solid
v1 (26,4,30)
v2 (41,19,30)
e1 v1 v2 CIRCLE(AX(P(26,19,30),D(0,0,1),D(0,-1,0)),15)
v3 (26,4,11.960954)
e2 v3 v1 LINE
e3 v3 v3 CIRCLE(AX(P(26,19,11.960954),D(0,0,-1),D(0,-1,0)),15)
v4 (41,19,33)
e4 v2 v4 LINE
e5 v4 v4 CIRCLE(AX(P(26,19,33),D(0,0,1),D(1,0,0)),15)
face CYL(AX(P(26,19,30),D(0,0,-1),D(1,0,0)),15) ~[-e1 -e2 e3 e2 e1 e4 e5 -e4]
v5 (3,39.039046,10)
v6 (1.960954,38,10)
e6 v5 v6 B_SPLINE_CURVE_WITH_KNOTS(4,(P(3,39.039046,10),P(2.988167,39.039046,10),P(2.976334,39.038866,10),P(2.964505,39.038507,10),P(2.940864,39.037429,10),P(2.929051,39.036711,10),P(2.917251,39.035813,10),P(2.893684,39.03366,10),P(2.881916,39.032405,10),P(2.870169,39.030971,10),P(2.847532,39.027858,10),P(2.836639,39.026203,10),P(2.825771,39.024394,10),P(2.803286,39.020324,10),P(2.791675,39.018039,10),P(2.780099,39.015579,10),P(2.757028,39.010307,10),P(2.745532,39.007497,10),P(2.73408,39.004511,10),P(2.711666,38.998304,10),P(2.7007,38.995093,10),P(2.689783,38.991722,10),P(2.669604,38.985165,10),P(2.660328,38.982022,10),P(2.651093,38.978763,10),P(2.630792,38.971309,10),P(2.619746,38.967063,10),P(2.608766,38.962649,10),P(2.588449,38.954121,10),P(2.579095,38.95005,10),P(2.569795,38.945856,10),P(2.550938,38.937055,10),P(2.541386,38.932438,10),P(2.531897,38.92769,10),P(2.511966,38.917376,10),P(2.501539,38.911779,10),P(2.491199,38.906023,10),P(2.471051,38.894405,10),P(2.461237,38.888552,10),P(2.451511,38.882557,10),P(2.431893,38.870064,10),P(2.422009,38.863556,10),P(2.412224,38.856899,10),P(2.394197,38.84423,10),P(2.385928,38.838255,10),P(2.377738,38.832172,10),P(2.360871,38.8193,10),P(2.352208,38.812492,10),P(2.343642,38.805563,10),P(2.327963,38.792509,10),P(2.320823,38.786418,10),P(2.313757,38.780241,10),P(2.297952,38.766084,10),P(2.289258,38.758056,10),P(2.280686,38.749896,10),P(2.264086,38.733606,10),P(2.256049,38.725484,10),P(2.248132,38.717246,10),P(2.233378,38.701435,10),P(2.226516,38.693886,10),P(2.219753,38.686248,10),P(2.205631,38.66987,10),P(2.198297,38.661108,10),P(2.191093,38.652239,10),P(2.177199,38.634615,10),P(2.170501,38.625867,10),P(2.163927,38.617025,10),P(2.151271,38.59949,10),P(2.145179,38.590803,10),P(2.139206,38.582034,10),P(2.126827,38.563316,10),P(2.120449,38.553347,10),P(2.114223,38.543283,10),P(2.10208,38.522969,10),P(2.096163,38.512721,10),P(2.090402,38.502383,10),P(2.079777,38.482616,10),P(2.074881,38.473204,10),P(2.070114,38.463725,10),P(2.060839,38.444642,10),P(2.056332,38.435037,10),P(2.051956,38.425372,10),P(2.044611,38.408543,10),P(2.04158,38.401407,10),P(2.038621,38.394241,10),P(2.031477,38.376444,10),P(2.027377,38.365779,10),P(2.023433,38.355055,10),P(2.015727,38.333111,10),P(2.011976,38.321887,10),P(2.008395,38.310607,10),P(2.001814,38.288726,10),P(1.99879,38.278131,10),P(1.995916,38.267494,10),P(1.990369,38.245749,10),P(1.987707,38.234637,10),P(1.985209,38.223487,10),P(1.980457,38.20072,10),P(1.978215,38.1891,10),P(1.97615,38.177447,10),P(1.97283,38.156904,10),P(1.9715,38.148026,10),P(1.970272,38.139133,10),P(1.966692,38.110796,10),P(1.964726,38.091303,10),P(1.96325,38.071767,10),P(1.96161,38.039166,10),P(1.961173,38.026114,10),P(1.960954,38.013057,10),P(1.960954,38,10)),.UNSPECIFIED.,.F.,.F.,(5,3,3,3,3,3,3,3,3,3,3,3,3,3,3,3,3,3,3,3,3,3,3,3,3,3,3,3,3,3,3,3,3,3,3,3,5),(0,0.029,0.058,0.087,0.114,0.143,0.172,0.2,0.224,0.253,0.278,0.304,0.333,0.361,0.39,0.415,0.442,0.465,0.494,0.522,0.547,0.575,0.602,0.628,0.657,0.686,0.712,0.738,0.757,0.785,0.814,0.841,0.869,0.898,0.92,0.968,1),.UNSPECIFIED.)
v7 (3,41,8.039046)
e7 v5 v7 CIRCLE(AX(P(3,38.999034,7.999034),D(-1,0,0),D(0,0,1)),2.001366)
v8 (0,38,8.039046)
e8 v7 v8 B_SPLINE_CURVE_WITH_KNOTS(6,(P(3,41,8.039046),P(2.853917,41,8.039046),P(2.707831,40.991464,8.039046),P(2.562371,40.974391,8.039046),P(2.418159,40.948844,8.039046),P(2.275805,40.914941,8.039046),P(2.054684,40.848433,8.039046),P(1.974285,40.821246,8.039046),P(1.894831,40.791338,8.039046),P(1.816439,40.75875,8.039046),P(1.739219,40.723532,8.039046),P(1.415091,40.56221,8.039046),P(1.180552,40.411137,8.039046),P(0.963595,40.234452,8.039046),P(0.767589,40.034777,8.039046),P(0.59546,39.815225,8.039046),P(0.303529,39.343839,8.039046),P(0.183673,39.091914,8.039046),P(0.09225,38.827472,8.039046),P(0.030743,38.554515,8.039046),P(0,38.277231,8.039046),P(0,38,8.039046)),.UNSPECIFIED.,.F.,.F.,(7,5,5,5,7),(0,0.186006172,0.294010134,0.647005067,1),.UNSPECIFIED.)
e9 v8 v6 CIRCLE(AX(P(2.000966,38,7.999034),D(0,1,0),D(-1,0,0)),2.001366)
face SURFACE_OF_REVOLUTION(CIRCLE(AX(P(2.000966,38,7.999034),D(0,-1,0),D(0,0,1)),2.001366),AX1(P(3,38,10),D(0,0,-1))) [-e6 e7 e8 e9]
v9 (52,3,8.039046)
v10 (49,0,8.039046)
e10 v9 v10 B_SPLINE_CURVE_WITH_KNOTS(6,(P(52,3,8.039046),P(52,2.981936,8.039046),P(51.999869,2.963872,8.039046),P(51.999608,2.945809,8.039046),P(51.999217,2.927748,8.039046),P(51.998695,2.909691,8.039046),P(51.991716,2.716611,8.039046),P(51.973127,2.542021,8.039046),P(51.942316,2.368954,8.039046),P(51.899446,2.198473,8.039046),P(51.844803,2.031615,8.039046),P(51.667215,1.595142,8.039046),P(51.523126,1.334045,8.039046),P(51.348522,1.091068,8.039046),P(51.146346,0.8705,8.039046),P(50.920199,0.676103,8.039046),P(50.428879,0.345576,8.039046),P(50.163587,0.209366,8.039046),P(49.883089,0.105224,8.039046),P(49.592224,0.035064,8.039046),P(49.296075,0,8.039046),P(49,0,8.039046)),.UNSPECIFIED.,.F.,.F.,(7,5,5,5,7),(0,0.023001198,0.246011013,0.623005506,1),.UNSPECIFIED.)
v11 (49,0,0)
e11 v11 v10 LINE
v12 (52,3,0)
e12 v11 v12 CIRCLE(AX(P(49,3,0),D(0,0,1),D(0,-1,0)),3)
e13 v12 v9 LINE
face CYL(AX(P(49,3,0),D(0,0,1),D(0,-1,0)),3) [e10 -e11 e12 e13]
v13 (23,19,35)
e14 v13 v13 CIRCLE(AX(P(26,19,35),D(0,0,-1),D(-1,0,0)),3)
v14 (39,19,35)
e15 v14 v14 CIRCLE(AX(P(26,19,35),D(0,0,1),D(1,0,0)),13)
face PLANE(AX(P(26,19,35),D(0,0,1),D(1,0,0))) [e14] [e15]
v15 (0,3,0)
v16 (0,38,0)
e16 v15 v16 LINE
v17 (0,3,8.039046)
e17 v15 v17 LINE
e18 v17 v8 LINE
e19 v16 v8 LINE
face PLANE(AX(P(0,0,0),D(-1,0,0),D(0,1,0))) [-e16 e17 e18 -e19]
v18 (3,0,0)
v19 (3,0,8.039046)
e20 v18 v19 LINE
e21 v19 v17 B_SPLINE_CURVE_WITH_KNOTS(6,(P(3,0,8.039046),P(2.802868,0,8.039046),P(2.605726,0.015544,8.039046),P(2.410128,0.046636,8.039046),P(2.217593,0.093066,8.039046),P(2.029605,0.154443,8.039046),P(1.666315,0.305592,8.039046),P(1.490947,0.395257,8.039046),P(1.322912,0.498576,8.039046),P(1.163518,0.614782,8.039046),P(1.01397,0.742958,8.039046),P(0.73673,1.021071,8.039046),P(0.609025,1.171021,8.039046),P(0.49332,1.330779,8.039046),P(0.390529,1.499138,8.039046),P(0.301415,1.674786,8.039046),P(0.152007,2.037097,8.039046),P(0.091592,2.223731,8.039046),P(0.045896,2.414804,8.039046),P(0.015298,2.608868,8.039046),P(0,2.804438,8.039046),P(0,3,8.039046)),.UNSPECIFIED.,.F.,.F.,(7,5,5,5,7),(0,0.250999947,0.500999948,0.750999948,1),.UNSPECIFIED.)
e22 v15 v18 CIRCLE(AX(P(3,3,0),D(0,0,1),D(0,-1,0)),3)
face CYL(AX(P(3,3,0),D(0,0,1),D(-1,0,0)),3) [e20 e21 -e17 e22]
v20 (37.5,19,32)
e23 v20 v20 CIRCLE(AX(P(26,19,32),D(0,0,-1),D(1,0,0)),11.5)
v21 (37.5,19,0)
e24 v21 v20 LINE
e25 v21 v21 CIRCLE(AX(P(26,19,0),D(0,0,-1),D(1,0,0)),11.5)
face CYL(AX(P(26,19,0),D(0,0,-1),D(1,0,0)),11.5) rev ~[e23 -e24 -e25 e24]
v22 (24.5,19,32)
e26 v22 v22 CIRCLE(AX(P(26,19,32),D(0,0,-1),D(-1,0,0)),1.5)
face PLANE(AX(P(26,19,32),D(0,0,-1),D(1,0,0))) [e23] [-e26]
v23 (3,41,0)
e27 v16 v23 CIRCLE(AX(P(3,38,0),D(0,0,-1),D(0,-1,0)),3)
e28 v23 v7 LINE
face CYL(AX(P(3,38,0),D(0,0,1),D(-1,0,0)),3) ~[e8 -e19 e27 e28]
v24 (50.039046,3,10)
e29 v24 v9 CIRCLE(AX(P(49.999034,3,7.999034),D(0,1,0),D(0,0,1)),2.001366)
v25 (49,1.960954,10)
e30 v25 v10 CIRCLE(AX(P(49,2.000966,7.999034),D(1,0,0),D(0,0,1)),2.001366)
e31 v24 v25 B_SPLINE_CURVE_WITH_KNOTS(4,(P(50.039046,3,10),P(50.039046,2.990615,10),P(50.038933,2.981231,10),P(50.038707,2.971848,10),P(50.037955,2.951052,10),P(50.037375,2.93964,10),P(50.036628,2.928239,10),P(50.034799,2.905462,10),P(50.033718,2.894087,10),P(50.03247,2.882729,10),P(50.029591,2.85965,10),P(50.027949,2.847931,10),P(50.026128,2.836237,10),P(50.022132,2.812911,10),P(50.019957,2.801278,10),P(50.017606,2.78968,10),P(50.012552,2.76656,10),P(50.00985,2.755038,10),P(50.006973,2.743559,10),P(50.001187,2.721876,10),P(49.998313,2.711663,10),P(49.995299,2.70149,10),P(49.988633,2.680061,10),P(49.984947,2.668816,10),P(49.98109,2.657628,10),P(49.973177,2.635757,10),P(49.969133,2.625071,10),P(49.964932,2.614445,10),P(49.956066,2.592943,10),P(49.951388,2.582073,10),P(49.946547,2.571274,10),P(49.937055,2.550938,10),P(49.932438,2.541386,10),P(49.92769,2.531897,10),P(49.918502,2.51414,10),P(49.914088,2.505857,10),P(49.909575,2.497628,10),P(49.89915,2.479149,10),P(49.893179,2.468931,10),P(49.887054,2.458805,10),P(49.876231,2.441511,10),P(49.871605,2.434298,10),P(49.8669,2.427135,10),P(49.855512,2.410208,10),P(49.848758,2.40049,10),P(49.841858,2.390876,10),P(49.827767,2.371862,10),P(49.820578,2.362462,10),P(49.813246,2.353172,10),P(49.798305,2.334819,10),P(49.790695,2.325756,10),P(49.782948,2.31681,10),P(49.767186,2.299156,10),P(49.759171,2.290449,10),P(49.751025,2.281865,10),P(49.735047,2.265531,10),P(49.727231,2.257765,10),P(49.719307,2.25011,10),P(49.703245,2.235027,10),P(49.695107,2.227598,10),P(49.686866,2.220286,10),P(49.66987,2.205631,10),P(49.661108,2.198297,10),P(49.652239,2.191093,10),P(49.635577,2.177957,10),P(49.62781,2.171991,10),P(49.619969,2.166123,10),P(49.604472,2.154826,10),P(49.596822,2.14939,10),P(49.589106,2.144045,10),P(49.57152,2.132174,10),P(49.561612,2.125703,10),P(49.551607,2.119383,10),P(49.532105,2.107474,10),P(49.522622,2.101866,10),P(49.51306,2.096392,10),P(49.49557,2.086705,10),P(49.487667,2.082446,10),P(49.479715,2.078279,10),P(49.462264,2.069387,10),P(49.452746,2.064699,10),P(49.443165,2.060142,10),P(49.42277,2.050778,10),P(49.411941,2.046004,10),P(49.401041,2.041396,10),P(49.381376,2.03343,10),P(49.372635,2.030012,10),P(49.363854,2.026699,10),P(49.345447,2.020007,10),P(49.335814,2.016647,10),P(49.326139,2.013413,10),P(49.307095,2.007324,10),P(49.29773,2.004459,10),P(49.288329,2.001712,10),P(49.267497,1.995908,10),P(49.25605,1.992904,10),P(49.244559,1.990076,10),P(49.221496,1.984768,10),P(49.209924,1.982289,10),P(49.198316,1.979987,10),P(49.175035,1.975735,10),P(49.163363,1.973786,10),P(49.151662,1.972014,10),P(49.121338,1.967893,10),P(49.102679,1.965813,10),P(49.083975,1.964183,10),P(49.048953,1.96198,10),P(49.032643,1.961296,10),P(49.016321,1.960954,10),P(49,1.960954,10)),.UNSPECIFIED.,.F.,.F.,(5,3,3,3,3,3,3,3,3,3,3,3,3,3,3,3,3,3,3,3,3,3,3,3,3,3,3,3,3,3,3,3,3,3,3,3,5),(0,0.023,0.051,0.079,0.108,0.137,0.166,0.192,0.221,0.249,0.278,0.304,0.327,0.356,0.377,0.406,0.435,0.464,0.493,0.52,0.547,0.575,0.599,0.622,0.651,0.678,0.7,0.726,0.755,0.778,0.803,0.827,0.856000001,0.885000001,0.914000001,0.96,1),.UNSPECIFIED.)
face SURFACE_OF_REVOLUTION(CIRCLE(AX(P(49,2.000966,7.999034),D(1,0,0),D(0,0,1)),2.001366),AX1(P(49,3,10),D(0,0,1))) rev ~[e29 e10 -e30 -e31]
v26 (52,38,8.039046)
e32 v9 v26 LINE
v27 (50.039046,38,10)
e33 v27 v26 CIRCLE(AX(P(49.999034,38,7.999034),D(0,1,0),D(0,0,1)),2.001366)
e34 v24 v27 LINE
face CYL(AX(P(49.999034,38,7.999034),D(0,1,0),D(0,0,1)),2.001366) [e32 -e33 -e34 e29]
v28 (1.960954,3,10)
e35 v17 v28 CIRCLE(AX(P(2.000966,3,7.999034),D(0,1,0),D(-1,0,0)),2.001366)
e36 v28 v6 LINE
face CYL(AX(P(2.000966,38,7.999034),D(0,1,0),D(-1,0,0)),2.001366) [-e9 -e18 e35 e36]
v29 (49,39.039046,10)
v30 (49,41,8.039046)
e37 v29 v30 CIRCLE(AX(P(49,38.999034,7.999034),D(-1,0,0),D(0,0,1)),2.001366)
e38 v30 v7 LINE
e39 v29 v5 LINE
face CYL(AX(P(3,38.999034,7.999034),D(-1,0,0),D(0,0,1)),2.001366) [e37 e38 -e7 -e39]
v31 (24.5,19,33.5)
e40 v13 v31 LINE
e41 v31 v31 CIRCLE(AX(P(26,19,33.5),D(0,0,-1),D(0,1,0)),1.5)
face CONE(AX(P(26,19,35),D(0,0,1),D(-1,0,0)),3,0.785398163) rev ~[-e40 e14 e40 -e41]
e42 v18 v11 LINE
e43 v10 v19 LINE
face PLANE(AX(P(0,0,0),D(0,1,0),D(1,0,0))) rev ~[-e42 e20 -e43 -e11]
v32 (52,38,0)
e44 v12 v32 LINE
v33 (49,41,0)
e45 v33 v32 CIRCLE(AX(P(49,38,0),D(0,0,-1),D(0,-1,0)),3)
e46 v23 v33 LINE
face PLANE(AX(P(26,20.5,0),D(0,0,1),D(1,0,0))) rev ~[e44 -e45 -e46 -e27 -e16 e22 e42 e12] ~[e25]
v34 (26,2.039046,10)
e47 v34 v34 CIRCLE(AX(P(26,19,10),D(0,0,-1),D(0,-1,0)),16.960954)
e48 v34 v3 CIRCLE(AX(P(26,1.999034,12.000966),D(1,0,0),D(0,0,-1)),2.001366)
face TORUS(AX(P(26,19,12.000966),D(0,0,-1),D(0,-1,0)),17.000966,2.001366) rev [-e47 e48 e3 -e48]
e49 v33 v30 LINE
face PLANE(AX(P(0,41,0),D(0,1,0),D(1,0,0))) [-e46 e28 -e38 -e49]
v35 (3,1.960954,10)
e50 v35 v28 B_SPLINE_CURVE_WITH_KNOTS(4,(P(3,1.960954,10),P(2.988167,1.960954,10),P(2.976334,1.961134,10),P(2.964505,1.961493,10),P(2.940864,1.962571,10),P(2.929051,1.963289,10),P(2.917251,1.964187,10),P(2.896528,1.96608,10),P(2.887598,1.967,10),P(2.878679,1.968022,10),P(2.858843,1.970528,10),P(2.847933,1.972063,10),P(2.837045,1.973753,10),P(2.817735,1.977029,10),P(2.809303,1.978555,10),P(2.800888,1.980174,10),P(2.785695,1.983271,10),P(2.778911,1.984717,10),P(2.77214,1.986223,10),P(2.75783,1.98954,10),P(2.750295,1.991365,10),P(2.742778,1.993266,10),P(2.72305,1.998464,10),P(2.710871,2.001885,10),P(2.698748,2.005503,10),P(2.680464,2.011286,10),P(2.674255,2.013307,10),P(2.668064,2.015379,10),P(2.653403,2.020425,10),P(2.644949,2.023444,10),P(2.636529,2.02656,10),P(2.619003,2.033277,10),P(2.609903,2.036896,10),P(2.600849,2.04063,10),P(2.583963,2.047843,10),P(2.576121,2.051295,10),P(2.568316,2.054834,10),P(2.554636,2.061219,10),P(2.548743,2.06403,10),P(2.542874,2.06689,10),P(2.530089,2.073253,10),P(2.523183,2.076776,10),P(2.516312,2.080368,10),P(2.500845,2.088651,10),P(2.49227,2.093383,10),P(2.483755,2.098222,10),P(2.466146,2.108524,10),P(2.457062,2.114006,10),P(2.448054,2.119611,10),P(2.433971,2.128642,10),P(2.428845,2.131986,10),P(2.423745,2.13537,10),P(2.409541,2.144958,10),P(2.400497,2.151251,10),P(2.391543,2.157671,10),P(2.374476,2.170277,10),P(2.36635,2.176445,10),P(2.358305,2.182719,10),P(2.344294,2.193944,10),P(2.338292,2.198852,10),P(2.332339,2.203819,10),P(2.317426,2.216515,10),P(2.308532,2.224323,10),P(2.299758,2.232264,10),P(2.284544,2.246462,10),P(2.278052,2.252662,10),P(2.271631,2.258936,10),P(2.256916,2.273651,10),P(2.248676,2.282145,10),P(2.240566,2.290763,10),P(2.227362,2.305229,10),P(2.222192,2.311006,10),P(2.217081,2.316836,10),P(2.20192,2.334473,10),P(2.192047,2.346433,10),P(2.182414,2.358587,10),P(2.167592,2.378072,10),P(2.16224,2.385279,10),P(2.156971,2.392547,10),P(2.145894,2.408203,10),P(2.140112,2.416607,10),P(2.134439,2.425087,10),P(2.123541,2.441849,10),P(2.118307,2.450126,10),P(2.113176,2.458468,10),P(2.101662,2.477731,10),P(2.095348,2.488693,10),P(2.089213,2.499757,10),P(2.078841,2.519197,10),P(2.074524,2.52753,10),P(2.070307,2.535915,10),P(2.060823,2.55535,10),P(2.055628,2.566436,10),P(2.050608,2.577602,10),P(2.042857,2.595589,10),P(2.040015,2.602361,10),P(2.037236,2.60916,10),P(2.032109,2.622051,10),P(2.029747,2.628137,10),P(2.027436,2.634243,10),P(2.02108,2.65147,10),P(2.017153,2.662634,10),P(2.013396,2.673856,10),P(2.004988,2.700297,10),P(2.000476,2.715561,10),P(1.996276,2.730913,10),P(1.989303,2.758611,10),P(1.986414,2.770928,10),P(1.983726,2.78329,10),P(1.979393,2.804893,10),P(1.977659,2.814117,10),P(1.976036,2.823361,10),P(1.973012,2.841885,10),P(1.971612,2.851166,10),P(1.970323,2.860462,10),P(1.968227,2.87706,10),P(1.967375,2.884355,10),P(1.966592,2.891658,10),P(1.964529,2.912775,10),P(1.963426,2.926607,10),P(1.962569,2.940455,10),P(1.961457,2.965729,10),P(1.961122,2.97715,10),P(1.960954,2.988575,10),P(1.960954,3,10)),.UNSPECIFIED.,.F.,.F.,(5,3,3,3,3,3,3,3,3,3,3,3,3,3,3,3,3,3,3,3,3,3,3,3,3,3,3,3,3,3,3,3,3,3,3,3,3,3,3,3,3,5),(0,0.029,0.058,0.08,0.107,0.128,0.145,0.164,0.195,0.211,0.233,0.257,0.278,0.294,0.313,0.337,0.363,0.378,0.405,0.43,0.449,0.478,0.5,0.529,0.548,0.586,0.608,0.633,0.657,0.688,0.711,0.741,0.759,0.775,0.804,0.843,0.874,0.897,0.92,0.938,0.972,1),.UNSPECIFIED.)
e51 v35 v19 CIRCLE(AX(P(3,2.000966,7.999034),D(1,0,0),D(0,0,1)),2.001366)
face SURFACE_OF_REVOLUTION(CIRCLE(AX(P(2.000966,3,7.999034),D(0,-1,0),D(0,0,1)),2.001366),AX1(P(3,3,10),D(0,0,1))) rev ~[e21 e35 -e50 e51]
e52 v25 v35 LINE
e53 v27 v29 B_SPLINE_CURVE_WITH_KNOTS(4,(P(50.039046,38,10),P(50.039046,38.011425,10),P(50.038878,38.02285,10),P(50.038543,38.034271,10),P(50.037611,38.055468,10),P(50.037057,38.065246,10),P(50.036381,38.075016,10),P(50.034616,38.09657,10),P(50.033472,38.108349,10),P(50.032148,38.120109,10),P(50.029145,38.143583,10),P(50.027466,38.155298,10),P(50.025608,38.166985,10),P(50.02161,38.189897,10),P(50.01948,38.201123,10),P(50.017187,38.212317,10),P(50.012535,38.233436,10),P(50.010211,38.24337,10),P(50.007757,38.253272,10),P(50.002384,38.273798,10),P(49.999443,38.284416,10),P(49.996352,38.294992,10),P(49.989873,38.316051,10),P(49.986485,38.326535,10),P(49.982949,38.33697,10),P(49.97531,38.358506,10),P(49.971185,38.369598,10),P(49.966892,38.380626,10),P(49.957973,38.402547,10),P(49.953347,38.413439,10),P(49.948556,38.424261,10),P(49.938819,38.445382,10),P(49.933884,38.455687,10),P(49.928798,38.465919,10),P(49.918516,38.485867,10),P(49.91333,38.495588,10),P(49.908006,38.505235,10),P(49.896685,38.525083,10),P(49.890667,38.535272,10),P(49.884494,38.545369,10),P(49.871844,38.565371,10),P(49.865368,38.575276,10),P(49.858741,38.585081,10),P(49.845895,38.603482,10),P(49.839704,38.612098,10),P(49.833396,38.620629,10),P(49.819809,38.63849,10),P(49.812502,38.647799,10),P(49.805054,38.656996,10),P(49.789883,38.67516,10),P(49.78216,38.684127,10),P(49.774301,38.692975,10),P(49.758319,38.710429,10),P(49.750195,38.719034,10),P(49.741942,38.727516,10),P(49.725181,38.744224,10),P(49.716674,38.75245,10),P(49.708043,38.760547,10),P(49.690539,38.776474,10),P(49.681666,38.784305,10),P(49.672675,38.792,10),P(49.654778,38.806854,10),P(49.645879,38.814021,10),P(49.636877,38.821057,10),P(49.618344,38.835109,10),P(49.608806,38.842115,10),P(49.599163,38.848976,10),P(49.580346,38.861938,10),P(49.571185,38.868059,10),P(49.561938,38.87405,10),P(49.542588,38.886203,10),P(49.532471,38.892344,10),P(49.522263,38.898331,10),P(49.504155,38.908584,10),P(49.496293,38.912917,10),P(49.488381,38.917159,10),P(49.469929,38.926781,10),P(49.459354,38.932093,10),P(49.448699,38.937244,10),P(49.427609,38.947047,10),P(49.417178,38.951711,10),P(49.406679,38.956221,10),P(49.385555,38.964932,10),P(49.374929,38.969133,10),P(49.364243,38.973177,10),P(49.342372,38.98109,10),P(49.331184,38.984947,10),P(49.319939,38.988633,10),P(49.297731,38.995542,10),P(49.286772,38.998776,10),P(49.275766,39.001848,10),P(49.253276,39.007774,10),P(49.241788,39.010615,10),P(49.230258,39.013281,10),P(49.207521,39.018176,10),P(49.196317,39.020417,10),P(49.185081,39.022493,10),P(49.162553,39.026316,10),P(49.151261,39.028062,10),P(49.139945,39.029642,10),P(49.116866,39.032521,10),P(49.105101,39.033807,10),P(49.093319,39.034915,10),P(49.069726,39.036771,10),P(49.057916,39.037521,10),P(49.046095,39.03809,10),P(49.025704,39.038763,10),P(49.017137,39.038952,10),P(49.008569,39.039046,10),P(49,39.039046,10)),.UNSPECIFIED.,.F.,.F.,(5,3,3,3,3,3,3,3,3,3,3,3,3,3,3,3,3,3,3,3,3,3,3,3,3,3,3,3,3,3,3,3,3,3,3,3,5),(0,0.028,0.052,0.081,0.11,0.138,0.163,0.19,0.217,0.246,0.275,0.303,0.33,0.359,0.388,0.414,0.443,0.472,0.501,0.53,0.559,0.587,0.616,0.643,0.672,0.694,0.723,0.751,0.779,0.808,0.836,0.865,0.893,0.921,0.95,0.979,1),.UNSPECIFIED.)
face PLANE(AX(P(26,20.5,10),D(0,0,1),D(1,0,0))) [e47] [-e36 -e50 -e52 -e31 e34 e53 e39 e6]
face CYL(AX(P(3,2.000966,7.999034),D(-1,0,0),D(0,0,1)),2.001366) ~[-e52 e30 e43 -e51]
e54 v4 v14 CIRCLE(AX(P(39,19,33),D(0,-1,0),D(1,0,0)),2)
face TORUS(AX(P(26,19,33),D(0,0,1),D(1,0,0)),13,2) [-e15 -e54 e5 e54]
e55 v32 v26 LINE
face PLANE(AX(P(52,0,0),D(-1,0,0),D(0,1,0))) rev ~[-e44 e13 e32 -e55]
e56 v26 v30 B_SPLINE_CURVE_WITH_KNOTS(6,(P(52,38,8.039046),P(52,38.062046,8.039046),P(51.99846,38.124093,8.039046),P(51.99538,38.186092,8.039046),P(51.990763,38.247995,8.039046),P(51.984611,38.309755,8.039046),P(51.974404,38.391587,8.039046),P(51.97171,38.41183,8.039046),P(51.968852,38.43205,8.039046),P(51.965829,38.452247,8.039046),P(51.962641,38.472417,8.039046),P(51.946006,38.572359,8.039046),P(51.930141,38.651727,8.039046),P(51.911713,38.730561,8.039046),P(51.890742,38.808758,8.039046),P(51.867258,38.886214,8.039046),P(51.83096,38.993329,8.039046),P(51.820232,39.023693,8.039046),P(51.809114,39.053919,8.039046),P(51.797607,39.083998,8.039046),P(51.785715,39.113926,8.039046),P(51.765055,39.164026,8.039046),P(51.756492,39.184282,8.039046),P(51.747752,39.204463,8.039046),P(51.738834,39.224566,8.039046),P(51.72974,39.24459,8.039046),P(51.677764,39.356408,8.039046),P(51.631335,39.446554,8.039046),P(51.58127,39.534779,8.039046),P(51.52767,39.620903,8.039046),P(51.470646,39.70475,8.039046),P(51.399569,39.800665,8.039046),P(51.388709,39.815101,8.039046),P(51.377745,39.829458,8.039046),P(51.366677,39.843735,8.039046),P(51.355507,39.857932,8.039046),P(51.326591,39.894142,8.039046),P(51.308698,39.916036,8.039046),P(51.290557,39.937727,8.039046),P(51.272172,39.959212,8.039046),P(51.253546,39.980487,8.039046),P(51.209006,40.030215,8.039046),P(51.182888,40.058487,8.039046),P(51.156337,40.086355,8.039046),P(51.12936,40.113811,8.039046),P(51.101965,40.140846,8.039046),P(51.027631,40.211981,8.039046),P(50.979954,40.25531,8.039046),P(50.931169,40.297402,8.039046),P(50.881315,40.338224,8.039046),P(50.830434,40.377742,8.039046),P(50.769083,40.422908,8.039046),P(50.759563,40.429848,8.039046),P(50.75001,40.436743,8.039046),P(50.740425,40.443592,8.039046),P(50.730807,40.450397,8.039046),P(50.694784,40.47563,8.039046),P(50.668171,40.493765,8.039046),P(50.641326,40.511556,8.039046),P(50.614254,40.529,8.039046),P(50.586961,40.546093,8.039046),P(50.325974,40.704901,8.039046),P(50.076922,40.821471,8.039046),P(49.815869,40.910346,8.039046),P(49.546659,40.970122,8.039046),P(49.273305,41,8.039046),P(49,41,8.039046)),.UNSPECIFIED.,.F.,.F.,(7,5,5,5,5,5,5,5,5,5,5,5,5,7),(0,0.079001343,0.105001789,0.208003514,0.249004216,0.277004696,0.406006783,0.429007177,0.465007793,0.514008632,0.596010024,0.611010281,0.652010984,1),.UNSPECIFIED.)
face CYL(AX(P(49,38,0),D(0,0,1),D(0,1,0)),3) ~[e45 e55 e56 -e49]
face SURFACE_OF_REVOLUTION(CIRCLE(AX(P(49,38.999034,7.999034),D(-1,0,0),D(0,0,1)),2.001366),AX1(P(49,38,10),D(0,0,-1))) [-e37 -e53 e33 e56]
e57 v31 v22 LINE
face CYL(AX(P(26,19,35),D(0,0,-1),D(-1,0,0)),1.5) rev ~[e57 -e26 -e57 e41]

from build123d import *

# Parameters (mm, degrees)
F0_W            = 52
F0_H            = 41
F1_DEPTH        = 10
F3_DEPTH        = 20
F4_R            = 11
F5_DEPTH        = 10.001
F6_R            = 15
F7_DEPTH        = 5
F9_R            = 3
F10_R           = 11.5
F10_R_2         = 9.5
F11_DEPTH       = 35
F12_T3_DEPTH    = 35
F12_T5_DEPTH    = 46
F12_T8_ANGLE    = 90
F12_T10_ANGLE   = 90
F12_T12_ANGLE   = 90
F12_T14_ANGLE   = 90
F13_R           = 10
F14_DEPTH       = 32
F15_R           = 11.5
F16_DEPTH       = 32
F18_D           = 3
F18_CSINK_D     = 6
F18_CSINK_ANGLE = 90


# Not quite as in the source:
# - a fillet or chamfer that OpenCascade refuses, or shapes differently, is made with other operations: its cross-section is extruded or revolved along the edge and cut away or added


with BuildPart() as f1:
    # F0 (on Top) → F1 (new body)
    with BuildSketch(Plane.XY):
        with Locations((26, 20.5)):
            Rectangle(F0_W, F0_H)
    extrude(amount=F1_DEPTH)

    # F2 (on face) → F3 (join)
    with BuildSketch(Plane.XY.offset(10)):
        with BuildLine():
            ThreePointArc((41, 19), (15.3933982822, 29.6066017178), (26, 4))
            ThreePointArc((26, 4), (36.6066017178, 8.3933982822), (41, 19))
        make_face()
        with BuildLine():
            ThreePointArc((37, 19), (33.7781745931, 11.2218254069), (26, 8))
            ThreePointArc((26, 8), (18.2218254069, 26.7781745931), (37, 19))
        make_face(mode=Mode.SUBTRACT)
    extrude(amount=F3_DEPTH)

    # F4 (on face) → F5 (cut, through all)
    with BuildSketch(Plane.XY.offset(10)):
        with Locations((26, 19)):
            Circle(F4_R)
    extrude(amount=-F5_DEPTH, mode=Mode.SUBTRACT)

    # F6 (on face) → F7 (join)
    with BuildSketch(Plane.XY.offset(30)):
        with Locations((26, 19)):
            Circle(F6_R)
    extrude(amount=F7_DEPTH)

    # F8: fillet of radius 2 on 1 edges, made by hand

    # F8_s1 → F8_t2 (revolve, cut)
    with BuildSketch(Plane.XZ.offset(-19)):
        with BuildLine():
            ThreePointArc((41, 33), (40.4142135624, 34.4142135624), (39, 35))
            Line((39, 35), (41, 35))
            Line((41, 35), (41, 33))
        make_face()
    revolve(axis=Axis((26, 19, 35), (0, 0, 1)), mode=Mode.SUBTRACT)

    # F9
    f9_edges = [f1.edges().sort_by_distance(p)[0] for p in [
        (52, 0, 5),
        (0, 0, 5),
        (0, 41, 5),
        (52, 41, 5),
    ]]
    fillet(f9_edges, radius=F9_R)

    # F10 (on face) → F11 (join)
    with BuildSketch(Plane(origin=(0, 0, 0), x_dir=(1, 0, 0), z_dir=(0, 0, -1))):
        with Locations((26, -19)):
            Circle(F10_R)
        with Locations((26, -19)):
            Circle(F10_R_2, mode=Mode.SUBTRACT)
    extrude(amount=-F11_DEPTH)

    # F12: fillet of radius 2 on 9 edges, made by hand

    # F12_s1 → F12_t2 (revolve)
    with BuildSketch(Plane.YZ.offset(26)):
        with BuildLine():
            ThreePointArc((1.9990343146, 9.9996), (3.4142135624, 10.5857864376), (4.0004, 12.0009656854))
            Line((4.0004, 12.0009656854), (4.2005365685, 12.0009656854))
            ThreePointArc((4.2005365685, 12.0009656854), (4.2001365685, 11.0004828427), (4.2001365685, 10))
            Line((4.2001365685, 10), (4, 9.7998634315))
            ThreePointArc((4, 9.7998634315), (2.9995171573, 9.7998634315), (1.9990343146, 9.7994634315))
            Line((1.9990343146, 9.7994634315), (1.9990343146, 9.9996))
        make_face()
    revolve(axis=Axis((26, 19, 10), (0, 0, 1)))

    # F12_s4 → F12_t3 (cut)
    with BuildSketch(Plane.XZ.offset(-38)):
        with BuildLine():
            ThreePointArc((-0.0004, 7.9990343146), (0.5857864376, 9.4142135624), (2.0009656854, 10.0004))
            Line((2.0009656854, 10.0004), (2.0009656854, 10.2005365685))
            ThreePointArc((2.0009656854, 10.2005365685), (1.0004828427, 10.2001365685), (0, 10.2001365685))
            Line((0, 10.2001365685), (-0.2001365685, 10))
            ThreePointArc((-0.2001365685, 10), (-0.2001365685, 8.9995171573), (-0.2005365685, 7.9990343146))
            Line((-0.2005365685, 7.9990343146), (-0.0004, 7.9990343146))
        make_face()
        with BuildLine():
            ThreePointArc((49.9990343146, 10.0004), (51.4142135624, 9.4142135624), (52.0004, 7.9990343146))
            Line((52.0004, 7.9990343146), (52.2005365685, 7.9990343146))
            ThreePointArc((52.2005365685, 7.9990343146), (52.2001365685, 8.9995171573), (52.2001365685, 10))
            Line((52.2001365685, 10), (52, 10.2001365685))
            ThreePointArc((52, 10.2001365685), (50.9995171573, 10.2001365685), (49.9990343146, 10.2005365685))
            Line((49.9990343146, 10.2005365685), (49.9990343146, 10.0004))
        make_face()
    extrude(amount=F12_T3_DEPTH, mode=Mode.SUBTRACT)

    # F12_s6 → F12_t5 (cut)
    with BuildSketch(Plane.YZ.offset(3)):
        with BuildLine():
            ThreePointArc((38.9990343146, 10.0004), (40.4142135624, 9.4142135624), (41.0004, 7.9990343146))
            Line((41.0004, 7.9990343146), (41.2005365685, 7.9990343146))
            ThreePointArc((41.2005365685, 7.9990343146), (41.2001365685, 8.9995171573), (41.2001365685, 10))
            Line((41.2001365685, 10), (41, 10.2001365685))
            ThreePointArc((41, 10.2001365685), (39.9995171573, 10.2001365685), (38.9990343146, 10.2005365685))
            Line((38.9990343146, 10.2005365685), (38.9990343146, 10.0004))
        make_face()
        with BuildLine():
            ThreePointArc((2.0009656854, 10.0004), (0.5857864376, 9.4142135624), (-0.0004, 7.9990343146))
            Line((-0.0004, 7.9990343146), (-0.2005365685, 7.9990343146))
            ThreePointArc((-0.2005365685, 7.9990343146), (-0.2001365685, 8.9995171573), (-0.2001365685, 10))
            Line((-0.2001365685, 10), (0, 10.2001365685))
            ThreePointArc((0, 10.2001365685), (1.0004828427, 10.2001365685), (2.0009656854, 10.2005365685))
            Line((2.0009656854, 10.2005365685), (2.0009656854, 10.0004))
        make_face()
    extrude(amount=F12_T5_DEPTH, mode=Mode.SUBTRACT)

    # F12_s7 → F12_t8 (revolve, cut)
    with BuildSketch(Plane.XZ.offset(-38)):
        with BuildLine():
            ThreePointArc((2.0009656854, 10.0004), (0.5857864376, 9.4142135624), (-0.0004, 7.9990343146))
            Line((-0.0004, 7.9990343146), (-0.2005365685, 7.9990343146))
            ThreePointArc((-0.2005365685, 7.9990343146), (-0.2001365685, 8.9995171573), (-0.2001365685, 10))
            Line((-0.2001365685, 10), (0, 10.2001365685))
            ThreePointArc((0, 10.2001365685), (1.0004828427, 10.2001365685), (2.0009656854, 10.2005365685))
            Line((2.0009656854, 10.2005365685), (2.0009656854, 10.0004))
        make_face()
    revolve(axis=Axis((3, 38, 10), (0, 0, -1)), revolution_arc=F12_T8_ANGLE, mode=Mode.SUBTRACT)

    # F12_s9 → F12_t10 (revolve, cut)
    with BuildSketch(Plane.XZ.offset(-3)):
        with BuildLine():
            ThreePointArc((2.0009656854, 10.0004), (0.5857864376, 9.4142135624), (-0.0004, 7.9990343146))
            Line((-0.0004, 7.9990343146), (-0.2005365685, 7.9990343146))
            ThreePointArc((-0.2005365685, 7.9990343146), (-0.2001365685, 8.9995171573), (-0.2001365685, 10))
            Line((-0.2001365685, 10), (0, 10.2001365685))
            ThreePointArc((0, 10.2001365685), (1.0004828427, 10.2001365685), (2.0009656854, 10.2005365685))
            Line((2.0009656854, 10.2005365685), (2.0009656854, 10.0004))
        make_face()
    revolve(axis=Axis((3, 3, 10), (0, 0, 1)), revolution_arc=F12_T10_ANGLE, mode=Mode.SUBTRACT)

    # F12_s11 → F12_t12 (revolve, cut)
    with BuildSketch(Plane.YZ.offset(49)):
        with BuildLine():
            ThreePointArc((38.9990343146, 10.0004), (40.4142135624, 9.4142135624), (41.0004, 7.9990343146))
            Line((41.0004, 7.9990343146), (41.2005365685, 7.9990343146))
            ThreePointArc((41.2005365685, 7.9990343146), (41.2001365685, 8.9995171573), (41.2001365685, 10))
            Line((41.2001365685, 10), (41, 10.2001365685))
            ThreePointArc((41, 10.2001365685), (39.9995171573, 10.2001365685), (38.9990343146, 10.2005365685))
            Line((38.9990343146, 10.2005365685), (38.9990343146, 10.0004))
        make_face()
    revolve(axis=Axis((49, 38, 10), (0, 0, -1)), revolution_arc=F12_T12_ANGLE, mode=Mode.SUBTRACT)

    # F12_s13 → F12_t14 (revolve, cut)
    with BuildSketch(Plane.YZ.offset(49)):
        with BuildLine():
            ThreePointArc((2.0009656854, 10.0004), (0.5857864376, 9.4142135624), (-0.0004, 7.9990343146))
            Line((-0.0004, 7.9990343146), (-0.2005365685, 7.9990343146))
            ThreePointArc((-0.2005365685, 7.9990343146), (-0.2001365685, 8.9995171573), (-0.2001365685, 10))
            Line((-0.2001365685, 10), (0, 10.2001365685))
            ThreePointArc((0, 10.2001365685), (1.0004828427, 10.2001365685), (2.0009656854, 10.2005365685))
            Line((2.0009656854, 10.2005365685), (2.0009656854, 10.0004))
        make_face()
    revolve(axis=Axis((49, 3, 10), (0, 0, 1)), revolution_arc=F12_T14_ANGLE, mode=Mode.SUBTRACT)

    # F13 (on face) → F14 (cut)
    with BuildSketch(Plane(origin=(0, 0, 0), x_dir=(1, 0, 0), z_dir=(0, 0, -1))):
        with Locations((26, -19)):
            Circle(F13_R)
    extrude(amount=-F14_DEPTH, mode=Mode.SUBTRACT)

    # F15 (on face) → F16 (cut, through all)
    with BuildSketch(Plane(origin=(0, 0, 0), x_dir=(1, 0, 0), z_dir=(0, 0, -1))):
        with Locations((26, -19)):
            Circle(F15_R)
    extrude(amount=-F16_DEPTH, mode=Mode.SUBTRACT)

    # F18 (through all)
    with Locations(Plane.XY.offset(35)):
        with Locations((26, 19)):
            CounterSinkHole(F18_D / 2, F18_CSINK_D / 2, counter_sink_angle=F18_CSINK_ANGLE)


solid = f1.part
